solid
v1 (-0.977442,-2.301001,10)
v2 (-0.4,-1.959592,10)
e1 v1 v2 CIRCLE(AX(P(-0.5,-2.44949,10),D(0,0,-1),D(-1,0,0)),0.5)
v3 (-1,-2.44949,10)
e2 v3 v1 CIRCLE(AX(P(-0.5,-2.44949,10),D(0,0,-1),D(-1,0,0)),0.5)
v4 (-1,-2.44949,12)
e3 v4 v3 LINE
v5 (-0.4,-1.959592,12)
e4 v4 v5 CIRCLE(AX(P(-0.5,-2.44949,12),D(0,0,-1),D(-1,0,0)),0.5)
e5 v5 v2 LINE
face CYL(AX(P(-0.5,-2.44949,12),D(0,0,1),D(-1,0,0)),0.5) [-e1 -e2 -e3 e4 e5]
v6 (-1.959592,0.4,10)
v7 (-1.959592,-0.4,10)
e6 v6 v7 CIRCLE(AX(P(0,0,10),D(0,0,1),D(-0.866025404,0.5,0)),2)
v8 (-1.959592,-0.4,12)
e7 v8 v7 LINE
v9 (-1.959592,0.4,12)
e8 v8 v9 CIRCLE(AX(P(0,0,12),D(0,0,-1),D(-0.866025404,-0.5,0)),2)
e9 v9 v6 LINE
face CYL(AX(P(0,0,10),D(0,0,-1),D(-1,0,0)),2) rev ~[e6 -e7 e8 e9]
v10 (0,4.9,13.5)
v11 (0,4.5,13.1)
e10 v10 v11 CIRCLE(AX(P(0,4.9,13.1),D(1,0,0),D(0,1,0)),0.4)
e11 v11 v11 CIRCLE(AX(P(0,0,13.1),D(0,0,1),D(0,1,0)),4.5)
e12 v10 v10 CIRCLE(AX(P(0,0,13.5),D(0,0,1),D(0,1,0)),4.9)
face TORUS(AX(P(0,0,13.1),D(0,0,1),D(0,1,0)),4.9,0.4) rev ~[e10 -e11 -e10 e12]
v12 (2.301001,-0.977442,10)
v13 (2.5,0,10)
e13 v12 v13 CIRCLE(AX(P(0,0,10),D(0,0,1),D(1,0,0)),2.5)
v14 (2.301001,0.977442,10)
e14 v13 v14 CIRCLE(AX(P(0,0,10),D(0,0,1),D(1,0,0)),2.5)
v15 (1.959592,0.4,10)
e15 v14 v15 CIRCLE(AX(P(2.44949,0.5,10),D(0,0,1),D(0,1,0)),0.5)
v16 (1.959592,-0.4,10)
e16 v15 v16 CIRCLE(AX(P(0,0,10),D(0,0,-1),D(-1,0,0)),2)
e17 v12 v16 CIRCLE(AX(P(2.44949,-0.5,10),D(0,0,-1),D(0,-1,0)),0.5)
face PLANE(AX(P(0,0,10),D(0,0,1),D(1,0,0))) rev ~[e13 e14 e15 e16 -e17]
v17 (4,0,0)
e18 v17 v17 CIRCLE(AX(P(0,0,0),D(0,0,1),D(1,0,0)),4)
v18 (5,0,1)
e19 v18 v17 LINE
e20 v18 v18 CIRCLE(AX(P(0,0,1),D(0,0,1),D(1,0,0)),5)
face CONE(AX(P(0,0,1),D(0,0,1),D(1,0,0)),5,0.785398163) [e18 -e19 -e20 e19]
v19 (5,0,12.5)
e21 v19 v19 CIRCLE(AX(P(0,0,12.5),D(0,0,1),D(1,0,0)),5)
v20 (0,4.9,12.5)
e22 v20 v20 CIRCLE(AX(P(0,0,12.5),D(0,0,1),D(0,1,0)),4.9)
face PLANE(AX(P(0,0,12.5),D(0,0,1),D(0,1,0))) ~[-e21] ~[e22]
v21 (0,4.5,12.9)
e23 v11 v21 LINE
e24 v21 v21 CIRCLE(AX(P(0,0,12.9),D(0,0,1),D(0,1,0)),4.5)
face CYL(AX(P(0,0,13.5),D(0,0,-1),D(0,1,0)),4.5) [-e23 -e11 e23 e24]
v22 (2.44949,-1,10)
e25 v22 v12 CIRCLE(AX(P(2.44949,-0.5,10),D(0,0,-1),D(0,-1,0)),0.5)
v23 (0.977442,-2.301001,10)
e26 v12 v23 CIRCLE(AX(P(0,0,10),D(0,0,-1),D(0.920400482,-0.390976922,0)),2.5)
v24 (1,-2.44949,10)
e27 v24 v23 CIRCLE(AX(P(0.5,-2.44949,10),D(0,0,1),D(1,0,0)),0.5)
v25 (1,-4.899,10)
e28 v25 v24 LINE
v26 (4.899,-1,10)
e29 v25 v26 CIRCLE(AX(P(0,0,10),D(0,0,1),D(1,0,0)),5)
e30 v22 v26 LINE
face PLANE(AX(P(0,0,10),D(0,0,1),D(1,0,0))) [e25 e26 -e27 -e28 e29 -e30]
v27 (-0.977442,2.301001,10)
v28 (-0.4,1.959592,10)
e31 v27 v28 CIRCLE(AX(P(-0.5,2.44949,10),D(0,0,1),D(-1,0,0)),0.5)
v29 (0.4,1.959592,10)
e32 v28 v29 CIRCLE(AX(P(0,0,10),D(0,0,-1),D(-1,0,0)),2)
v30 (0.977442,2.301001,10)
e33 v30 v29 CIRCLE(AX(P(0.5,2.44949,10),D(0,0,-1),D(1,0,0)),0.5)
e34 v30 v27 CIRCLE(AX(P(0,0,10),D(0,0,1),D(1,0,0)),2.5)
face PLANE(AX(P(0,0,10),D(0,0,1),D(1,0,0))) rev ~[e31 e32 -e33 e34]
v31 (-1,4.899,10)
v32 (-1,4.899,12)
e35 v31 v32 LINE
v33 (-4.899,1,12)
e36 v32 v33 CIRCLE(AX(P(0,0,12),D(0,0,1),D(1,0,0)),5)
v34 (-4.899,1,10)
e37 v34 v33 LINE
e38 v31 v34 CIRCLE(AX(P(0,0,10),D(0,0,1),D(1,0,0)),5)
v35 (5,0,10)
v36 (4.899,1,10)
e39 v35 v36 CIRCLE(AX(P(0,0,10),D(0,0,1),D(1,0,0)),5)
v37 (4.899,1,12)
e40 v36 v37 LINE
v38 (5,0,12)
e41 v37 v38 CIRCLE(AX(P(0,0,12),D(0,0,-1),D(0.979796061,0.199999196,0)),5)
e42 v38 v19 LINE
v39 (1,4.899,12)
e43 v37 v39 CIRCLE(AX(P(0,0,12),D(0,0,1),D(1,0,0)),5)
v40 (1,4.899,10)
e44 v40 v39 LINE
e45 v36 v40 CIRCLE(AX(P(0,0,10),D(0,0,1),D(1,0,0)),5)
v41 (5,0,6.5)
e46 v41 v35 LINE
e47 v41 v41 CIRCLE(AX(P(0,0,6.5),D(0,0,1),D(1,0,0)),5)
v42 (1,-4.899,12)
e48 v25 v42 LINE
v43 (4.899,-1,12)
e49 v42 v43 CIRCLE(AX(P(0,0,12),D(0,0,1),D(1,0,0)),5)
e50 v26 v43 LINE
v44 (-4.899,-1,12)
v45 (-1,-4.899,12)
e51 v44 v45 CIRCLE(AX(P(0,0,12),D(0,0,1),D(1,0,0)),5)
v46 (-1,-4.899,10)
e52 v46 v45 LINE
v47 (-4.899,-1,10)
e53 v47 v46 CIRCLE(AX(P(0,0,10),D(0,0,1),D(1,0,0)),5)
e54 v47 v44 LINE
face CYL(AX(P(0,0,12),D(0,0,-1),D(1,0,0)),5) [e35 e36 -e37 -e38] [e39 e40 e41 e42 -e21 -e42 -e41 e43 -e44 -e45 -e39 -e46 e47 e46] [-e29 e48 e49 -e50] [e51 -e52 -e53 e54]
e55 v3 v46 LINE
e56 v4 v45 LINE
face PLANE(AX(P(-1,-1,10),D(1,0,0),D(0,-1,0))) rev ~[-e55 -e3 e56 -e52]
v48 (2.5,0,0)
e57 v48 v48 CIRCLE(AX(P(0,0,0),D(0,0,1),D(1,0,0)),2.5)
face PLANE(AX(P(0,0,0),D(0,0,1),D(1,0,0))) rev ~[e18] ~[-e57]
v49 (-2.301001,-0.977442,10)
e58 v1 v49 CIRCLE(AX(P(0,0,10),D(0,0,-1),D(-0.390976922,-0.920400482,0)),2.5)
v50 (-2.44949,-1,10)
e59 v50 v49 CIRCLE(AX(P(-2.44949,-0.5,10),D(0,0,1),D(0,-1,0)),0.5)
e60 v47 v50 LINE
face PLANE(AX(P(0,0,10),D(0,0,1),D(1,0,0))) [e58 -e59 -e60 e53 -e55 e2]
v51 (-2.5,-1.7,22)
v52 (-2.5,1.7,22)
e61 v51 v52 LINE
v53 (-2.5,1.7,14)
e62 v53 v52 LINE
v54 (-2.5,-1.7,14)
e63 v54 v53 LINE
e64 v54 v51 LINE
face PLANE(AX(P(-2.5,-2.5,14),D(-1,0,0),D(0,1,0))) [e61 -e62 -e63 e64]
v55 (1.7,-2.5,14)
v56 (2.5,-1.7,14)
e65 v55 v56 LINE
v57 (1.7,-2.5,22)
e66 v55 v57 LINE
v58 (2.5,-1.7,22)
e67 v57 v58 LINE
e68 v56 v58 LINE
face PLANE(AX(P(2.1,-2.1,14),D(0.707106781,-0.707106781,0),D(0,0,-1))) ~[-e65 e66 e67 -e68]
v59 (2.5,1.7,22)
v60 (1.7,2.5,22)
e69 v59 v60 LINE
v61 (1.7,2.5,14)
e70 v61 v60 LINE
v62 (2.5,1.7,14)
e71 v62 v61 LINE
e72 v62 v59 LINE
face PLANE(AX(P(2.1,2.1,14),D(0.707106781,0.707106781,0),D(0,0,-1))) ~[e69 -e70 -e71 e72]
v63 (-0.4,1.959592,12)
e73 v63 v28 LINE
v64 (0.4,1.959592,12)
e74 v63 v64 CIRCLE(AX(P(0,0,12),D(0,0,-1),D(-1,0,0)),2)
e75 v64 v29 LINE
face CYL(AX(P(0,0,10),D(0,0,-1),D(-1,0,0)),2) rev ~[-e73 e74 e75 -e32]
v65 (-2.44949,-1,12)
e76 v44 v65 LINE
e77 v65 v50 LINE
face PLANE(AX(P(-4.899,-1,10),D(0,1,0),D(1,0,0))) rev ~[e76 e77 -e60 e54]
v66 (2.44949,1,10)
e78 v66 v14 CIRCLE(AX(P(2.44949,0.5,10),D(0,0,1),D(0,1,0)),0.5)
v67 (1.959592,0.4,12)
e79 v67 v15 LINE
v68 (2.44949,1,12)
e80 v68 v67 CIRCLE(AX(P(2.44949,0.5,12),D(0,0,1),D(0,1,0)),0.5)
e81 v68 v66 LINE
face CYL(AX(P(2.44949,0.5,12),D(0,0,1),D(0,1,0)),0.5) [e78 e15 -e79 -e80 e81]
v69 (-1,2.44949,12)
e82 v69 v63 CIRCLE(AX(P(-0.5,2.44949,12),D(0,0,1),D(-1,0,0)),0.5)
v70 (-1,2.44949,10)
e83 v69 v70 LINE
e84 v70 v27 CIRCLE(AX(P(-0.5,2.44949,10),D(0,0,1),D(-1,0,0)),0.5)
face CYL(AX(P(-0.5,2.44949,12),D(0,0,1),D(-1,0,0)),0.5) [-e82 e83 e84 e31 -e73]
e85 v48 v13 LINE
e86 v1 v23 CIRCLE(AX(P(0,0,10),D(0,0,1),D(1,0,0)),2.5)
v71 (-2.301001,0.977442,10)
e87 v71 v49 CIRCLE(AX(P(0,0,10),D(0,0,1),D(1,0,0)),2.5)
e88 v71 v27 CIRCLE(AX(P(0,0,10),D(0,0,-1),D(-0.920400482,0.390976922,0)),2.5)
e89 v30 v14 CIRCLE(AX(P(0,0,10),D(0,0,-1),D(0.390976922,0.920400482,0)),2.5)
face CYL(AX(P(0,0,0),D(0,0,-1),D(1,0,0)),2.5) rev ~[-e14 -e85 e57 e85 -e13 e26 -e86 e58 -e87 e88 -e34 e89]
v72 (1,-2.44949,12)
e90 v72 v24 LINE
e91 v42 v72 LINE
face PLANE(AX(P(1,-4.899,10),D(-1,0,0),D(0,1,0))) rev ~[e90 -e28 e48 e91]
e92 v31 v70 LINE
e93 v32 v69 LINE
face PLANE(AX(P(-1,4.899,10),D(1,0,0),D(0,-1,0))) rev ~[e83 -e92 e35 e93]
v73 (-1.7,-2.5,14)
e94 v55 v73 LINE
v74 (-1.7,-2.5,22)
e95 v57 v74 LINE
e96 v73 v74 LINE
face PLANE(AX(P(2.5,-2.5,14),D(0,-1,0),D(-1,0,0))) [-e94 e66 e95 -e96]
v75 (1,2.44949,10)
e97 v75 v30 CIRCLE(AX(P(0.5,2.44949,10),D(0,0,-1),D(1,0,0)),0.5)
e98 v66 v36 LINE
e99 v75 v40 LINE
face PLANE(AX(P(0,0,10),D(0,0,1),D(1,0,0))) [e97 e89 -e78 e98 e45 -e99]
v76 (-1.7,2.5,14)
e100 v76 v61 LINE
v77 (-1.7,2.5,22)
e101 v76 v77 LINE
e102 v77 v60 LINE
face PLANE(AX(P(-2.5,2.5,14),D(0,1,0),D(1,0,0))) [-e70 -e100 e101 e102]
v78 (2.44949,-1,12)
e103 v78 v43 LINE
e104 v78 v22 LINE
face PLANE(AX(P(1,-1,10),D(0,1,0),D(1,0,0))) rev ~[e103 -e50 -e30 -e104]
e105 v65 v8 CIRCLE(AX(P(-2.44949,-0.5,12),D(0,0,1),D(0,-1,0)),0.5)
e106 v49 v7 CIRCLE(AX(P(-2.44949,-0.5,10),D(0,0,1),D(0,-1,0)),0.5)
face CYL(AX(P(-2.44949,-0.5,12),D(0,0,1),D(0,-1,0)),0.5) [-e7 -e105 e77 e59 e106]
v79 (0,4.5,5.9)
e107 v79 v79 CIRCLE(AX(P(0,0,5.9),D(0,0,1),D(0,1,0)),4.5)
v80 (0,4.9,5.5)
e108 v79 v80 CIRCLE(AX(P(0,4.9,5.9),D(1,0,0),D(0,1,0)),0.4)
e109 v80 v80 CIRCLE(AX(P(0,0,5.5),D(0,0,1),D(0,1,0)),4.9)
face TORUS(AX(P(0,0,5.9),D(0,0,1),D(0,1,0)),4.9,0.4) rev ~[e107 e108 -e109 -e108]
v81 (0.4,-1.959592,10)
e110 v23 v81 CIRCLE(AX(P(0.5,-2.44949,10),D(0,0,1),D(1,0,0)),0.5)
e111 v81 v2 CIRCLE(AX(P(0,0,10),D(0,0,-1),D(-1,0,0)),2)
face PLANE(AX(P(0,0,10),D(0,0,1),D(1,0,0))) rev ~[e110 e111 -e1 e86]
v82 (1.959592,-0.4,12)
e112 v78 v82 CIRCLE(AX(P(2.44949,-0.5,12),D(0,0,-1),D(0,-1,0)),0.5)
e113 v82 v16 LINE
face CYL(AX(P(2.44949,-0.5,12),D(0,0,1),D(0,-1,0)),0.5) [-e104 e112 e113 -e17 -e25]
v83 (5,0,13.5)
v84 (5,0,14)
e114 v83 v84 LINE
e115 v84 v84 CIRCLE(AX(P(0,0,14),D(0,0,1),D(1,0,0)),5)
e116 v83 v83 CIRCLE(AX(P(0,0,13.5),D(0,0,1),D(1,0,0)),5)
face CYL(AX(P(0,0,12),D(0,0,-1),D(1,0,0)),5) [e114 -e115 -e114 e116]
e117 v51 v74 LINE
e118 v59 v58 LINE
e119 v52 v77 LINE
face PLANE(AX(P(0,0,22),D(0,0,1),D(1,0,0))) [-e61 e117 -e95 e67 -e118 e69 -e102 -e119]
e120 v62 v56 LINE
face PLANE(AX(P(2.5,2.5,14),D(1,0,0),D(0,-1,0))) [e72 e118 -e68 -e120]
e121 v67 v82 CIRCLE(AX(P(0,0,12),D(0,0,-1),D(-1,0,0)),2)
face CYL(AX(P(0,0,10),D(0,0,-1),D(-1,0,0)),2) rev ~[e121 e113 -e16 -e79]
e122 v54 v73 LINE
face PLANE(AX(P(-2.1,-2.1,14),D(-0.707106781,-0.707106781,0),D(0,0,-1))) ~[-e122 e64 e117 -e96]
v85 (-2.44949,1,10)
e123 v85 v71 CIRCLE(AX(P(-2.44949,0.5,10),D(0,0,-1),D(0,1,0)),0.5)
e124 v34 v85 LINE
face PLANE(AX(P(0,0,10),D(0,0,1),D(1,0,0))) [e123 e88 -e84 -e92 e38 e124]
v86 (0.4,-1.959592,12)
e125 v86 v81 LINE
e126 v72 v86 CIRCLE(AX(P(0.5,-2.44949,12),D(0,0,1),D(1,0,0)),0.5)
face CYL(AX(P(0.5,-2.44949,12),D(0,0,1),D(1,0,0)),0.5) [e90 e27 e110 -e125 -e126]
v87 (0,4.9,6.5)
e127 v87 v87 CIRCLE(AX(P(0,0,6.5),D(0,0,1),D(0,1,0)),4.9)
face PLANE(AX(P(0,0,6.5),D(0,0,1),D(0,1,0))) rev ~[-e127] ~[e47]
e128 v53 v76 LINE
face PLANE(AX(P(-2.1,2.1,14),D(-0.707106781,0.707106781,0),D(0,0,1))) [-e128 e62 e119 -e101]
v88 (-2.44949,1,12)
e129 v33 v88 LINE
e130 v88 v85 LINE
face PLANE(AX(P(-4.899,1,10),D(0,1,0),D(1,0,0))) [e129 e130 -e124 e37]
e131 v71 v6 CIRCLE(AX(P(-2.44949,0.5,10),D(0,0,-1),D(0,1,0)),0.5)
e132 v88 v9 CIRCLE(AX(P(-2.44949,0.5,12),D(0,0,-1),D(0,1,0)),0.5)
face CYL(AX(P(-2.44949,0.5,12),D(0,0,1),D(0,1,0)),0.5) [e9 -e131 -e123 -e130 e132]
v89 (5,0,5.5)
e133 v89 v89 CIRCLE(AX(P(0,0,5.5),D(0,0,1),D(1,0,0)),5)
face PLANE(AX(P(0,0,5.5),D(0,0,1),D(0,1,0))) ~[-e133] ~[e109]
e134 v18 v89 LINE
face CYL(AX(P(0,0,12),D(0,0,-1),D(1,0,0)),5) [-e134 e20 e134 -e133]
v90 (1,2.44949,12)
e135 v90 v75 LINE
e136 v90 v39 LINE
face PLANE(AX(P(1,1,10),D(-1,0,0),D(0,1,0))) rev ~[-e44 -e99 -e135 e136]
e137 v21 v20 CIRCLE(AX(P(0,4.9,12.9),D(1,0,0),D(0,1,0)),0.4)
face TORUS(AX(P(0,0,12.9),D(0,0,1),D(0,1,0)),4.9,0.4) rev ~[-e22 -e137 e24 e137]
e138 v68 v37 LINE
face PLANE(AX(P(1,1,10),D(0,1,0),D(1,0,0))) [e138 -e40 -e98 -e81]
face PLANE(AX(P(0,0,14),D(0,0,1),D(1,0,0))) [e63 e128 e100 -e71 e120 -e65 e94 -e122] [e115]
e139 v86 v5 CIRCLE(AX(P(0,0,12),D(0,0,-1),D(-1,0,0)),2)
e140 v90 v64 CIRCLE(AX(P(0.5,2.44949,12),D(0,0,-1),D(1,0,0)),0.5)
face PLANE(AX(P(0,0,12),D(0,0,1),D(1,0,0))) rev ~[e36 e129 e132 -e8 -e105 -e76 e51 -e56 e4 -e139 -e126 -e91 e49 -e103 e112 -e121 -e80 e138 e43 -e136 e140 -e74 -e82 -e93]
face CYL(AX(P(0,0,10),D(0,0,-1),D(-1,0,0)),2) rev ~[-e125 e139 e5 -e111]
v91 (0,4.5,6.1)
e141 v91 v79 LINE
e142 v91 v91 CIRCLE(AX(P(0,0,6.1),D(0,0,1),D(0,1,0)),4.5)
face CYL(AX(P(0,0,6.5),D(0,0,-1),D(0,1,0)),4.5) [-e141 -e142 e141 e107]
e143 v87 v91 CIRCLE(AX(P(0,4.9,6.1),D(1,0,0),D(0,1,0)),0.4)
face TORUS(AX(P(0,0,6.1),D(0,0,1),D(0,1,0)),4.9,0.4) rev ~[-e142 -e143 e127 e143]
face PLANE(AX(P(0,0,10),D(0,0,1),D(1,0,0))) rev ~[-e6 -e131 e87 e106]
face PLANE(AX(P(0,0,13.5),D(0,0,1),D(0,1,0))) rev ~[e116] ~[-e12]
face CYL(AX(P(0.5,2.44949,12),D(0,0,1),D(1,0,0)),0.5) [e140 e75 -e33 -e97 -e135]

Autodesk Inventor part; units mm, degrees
ref_plane "YZ Plane" through (0, 0, 0) normal (1, 0, 0) x (0, 1, 0)
ref_plane "XZ Plane" through (0, 0, 0) normal (0, 1, 0) x (-1, 0, 0)
ref_plane "XY Plane" through (0, 0, 0) normal (0, 0, 1) x (1, 0, 0)
sketch "Sketch1" plane through (0, 0, 0) normal (0, 0, 1) x (1, 0, 0)
  circle A0 centre (0, 0) radius 2.5
  circle A1 centre (0, 0) radius 5
  dimension "d0" = 5
  dimension "d1" = 10
extrude "Extrusion1" add sketch "Sketch1" along normal blind 10
sketch "Sketch2" plane through (0, 0, 10) normal (0, 0, 1) x (1, 0, 0)
  circle A0 centre (0, 0) radius 5 projected
  circle A1 centre (0, 0) radius 5 projected
  line L0 (-4.899, 1) -> (4.899, 1)
  line L1 (-4.899, -1) -> (4.899, -1)
  line L2 (-1, 4.899) -> (-1, -4.899)
  line L3 (1, -4.899) -> (1, 4.899)
  point P0 (1, 1)
  point P1 (-1, 1)
  point P2 (-1, -1)
  point P3 (1, -1)
  dimension "d4" = 1
  dimension "d5" = 1
  dimension "d6" = 1
  dimension "d7" = 1
extrude "Extrusion2" add sketch "Sketch2" along normal blind 2 contours A0 L1 L3 L0 | L3 L0 L2 A0 | L3 L1 L2 L0 | A0 L2 L1 L3 | L2 L1 A0 L0
sketch "Sketch3" plane through (0, 0, 12) normal (0, 0, 1) x (1, 0, 0)
  circle A0 centre (0, 0) radius 5
  dimension "d11" = 10
extrude "Extrusion3" add sketch "Sketch3" along normal blind 2
chamfer "Chamfer1" distance 1 angle 45 1 edges at (-5, 0, 0)
sketch "Sketch4" plane through (0, 0, 10) normal (0, 0, -1) x (-1, 0, 0)
  circle A0 centre (0, 0) radius 2
  dimension "d17" = 4
extrude "Extrusion4" cut sketch "Sketch4" against normal blind 2
fillet "Fillet2" radius 0.5 8 edges at (-1, 1.7321, 11) (-1, -1.7321, 11) (-1.7321, -1, 11) (1.7321, -1, 11) (1.7321, 1, 11) (-1.7321, 1, 11) (1, 1.7321, 11) (1, -1.7321, 11)
sketch "Sketch5" plane through (0, 0, 14) normal (0, 0, 1) x (1, 0, 0)
  line L0 (-2.5, 2.5) -> (2.5, 2.5)
  line L1 (2.5, 2.5) -> (2.5, -2.5)
  line L2 (2.5, -2.5) -> (-2.5, -2.5)
  line L3 (-2.5, -2.5) -> (-2.5, 2.5)
  line L4 (-2.5, 2.5) -> (2.5, -2.5) construction
  line L5 (2.5, 2.5) -> (-2.5, -2.5) construction
  point P0 (0, 0)
  dimension "d21" = 5
  dimension "d22" = 5
extrude "Extrusion5" add sketch "Sketch5" along normal blind 8
chamfer "Chamfer2" distance 0.8 angle 45 4 edges at (2.5, 2.5, 18) (-2.5, 2.5, 18) (2.5, -2.5, 18) (-2.5, -2.5, 18)
sketch "Sketch6" plane through (0, 0, 0) normal (1, 0, 0) x (0, 1, 0)
  line L0 (5.5, 13.5) -> (4.5, 13.5)
  line L1 (4.5, 13.5) -> (4.5, 12.5)
  line L2 (4.5, 12.5) -> (5.5, 12.5)
  line L3 (5.5, 12.5) -> (5.5, 13.5)
  line L4 (5, 1) -> (5, 14) projected
  line L5 (5.5, 13.5) -> (4.5, 12.5) construction
  line L6 (4.5, 13.5) -> (5.5, 12.5) construction
  line L7 (5.5, 6.5) -> (4.5, 6.5)
  line L8 (4.5, 6.5) -> (4.5, 5.5)
  line L9 (4.5, 5.5) -> (5.5, 5.5)
  line L10 (5.5, 5.5) -> (5.5, 6.5)
  line L11 (5.5, 6.5) -> (4.5, 5.5) construction
  line L12 (4.5, 6.5) -> (5.5, 5.5) construction
  line L13 (4.899, 10) -> (4.899, 12) projected
  line L14 (4.899, 12) -> (1, 12) projected
  line L15 (4.899, 12) -> (4.899, 14)
  line L16 (4.899, 10) -> (1, 10) projected
  line L17 (0, -4.4) -> (0, 26.4) projected
  point P0 (0, 0)
  point P1 (5, 13)
  point P2 (5, 6)
  dimension "d28" = 1
  dimension "d29" = 1
  dimension "d30" = 1
  dimension "d31" = 4
revolve "Revolution1" cut sketch "Sketch6" angle 360 about axis through (0, 0, -10) along (0, 0, 1)
fillet "Fillet3" radius 0.4 4 edges at (0, -4.5, 13.5) (0, -4.5, 6.5) (0, -4.5, 5.5) (0, -4.5, 12.5)
equation "\"d5\" = d4"
equation "\"d6\" = d4"
properties part number "VacuumRotor" material "Nylon, molybdenum disulphide"
